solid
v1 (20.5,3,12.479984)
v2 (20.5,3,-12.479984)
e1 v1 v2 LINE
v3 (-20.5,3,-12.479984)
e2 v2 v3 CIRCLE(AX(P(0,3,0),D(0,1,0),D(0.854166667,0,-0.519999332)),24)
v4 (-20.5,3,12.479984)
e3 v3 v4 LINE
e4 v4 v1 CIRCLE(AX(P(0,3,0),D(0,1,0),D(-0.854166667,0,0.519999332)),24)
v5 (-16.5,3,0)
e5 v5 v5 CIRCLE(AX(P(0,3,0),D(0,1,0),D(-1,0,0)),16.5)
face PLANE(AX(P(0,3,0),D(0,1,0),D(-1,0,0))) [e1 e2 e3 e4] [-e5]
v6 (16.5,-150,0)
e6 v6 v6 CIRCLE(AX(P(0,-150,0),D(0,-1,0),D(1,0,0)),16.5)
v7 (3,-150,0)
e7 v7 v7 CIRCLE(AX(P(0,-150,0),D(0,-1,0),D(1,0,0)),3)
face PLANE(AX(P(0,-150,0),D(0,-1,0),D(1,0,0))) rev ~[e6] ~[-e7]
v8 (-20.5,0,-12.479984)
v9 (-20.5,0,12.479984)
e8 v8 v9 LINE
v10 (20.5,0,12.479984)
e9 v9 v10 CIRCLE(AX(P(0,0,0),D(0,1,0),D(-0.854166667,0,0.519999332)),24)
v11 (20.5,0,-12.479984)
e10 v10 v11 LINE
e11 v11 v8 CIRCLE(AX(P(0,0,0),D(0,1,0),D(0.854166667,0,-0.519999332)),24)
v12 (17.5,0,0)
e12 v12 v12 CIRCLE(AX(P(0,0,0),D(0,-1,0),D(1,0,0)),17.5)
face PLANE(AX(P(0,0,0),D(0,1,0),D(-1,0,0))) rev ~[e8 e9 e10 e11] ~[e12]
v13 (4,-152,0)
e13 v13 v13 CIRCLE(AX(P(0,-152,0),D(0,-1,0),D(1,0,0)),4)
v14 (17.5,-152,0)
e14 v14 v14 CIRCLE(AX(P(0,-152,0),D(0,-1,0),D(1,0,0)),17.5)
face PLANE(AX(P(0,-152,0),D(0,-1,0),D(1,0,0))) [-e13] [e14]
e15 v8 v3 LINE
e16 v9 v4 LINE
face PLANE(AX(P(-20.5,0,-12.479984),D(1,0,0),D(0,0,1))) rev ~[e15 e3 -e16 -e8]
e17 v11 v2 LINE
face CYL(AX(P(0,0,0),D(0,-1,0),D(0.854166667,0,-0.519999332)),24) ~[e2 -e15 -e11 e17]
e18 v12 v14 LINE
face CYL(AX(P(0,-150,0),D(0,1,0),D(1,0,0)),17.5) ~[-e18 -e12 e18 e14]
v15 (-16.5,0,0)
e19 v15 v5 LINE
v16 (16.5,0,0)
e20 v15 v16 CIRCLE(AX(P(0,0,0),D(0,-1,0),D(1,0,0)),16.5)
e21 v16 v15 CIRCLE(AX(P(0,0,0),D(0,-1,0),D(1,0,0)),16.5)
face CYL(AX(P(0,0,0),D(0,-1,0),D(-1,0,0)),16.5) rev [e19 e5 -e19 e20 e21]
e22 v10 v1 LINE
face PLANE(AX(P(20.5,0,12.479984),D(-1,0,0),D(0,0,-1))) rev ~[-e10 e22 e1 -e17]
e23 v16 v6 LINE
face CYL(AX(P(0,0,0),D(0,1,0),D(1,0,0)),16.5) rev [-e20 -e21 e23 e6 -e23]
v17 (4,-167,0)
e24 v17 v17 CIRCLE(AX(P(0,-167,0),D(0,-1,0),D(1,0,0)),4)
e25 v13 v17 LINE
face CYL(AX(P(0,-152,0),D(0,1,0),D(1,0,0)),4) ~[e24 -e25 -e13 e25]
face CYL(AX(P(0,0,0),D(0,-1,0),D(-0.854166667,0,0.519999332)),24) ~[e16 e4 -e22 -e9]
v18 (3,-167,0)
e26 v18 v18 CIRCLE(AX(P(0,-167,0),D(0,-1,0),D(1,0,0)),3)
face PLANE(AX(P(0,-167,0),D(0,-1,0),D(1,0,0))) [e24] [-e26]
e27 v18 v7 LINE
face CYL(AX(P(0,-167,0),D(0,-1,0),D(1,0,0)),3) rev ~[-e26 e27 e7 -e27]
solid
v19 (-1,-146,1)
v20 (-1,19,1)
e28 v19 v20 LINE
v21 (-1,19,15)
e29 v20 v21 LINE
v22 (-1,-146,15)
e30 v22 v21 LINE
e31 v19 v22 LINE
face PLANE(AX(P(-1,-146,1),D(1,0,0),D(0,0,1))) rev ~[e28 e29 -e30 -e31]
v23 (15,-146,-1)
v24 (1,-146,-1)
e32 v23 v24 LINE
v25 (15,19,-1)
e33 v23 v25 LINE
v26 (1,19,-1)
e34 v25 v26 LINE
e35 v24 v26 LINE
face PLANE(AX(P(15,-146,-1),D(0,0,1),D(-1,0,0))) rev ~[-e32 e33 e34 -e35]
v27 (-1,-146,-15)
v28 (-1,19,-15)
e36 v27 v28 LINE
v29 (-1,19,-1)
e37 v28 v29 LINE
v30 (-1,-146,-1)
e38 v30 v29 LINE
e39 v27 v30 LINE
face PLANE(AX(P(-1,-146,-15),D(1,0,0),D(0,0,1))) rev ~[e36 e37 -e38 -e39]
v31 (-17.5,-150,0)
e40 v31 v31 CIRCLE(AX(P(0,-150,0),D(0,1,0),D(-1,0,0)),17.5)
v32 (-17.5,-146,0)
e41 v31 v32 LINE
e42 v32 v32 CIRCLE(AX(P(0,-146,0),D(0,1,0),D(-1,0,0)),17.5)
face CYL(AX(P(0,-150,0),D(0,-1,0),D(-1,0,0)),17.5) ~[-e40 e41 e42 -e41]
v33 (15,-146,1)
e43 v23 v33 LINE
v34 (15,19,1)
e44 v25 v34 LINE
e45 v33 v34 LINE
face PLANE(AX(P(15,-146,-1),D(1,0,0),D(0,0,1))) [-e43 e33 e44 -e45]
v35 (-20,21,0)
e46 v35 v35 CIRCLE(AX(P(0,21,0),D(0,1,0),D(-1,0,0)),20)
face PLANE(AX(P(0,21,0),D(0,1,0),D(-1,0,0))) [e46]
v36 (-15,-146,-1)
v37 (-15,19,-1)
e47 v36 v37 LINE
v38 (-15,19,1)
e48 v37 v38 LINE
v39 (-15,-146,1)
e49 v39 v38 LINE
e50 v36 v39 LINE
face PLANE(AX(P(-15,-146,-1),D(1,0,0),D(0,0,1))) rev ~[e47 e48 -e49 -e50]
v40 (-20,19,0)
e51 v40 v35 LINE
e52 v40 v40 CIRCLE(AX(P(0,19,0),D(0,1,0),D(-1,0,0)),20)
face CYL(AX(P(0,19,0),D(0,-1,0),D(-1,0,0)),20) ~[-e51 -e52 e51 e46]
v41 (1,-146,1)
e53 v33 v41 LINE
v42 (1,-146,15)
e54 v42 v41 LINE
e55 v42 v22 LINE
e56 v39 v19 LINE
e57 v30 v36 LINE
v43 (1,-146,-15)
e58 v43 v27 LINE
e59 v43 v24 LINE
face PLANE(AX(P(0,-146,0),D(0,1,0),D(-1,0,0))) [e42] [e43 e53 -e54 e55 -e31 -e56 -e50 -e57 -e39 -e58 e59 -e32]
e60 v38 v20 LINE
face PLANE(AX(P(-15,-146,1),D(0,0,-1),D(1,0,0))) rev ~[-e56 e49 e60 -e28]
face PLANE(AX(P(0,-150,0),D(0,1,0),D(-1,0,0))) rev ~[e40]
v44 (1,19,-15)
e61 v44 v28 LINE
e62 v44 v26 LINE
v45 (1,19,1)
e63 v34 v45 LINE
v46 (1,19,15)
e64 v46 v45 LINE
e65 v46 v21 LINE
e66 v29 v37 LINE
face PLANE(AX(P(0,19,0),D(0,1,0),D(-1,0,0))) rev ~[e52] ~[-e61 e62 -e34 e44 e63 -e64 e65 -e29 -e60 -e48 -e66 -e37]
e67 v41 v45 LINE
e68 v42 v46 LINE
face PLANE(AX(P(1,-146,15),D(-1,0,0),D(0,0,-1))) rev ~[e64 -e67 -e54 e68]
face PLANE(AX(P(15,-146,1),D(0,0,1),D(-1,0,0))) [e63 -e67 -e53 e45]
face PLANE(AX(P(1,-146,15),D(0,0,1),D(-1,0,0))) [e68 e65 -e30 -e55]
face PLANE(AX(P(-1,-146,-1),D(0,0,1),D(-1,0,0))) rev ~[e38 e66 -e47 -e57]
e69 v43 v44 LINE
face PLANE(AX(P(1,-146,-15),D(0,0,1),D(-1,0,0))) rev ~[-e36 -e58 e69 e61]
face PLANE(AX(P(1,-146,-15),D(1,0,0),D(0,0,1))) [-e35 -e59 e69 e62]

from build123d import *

# Parameters (mm, degrees)
F0_R      = 17.5
F0_R_2    = 16.5
F1_DEPTH  = 150
F2_R      = 17.5
F3_DEPTH  = 2
F4_R      = 4
F5_DEPTH  = 15
F6_R      = 3
F7_DEPTH  = 17
F8_R      = 17.5
F8_R_2    = 16.5
F9_DEPTH  = 3
F10_R     = 17.5
F11_DEPTH = 4
F12_W     = 14
F12_H     = 2
F12_W_2   = 2
F12_H_2   = 14
F13_DEPTH = 165
F14_R     = 20
F15_DEPTH = 2


with BuildPart() as f1:
    # F0 (on Front) → F1 (new body)
    with BuildSketch(Plane.XZ):
        Circle(F0_R)
        Circle(F0_R_2, mode=Mode.SUBTRACT)
    extrude(amount=F1_DEPTH)

    # F2 (on face) → F3 (join)
    with BuildSketch(Plane.XZ.offset(150)):
        Circle(F2_R)
    extrude(amount=F3_DEPTH)

    # F4 (on face) → F5 (join)
    with BuildSketch(Plane.XZ.offset(152)):
        Circle(F4_R)
    extrude(amount=F5_DEPTH)

    # F6 (on face) → F7 (cut, through all)
    with BuildSketch(Plane.XZ.offset(167)):
        Circle(F6_R)
    extrude(amount=-F7_DEPTH, mode=Mode.SUBTRACT)

    # F8 (on face) → F9 (join)
    with BuildSketch(Plane(origin=(0, 0, 0), x_dir=(-1, 0, 0), z_dir=(0, 1, 0))):
        with BuildLine():
            Line((20.5, -12.4799839743), (20.5, 12.4799839743))
            ThreePointArc((20.5, 12.4799839743), (0, 24), (-20.5, 12.4799839743))
            Line((-20.5, 12.4799839743), (-20.5, -12.4799839743))
            ThreePointArc((-20.5, -12.4799839743), (0, -24), (20.5, -12.4799839743))
        make_face()
        Circle(F8_R, mode=Mode.SUBTRACT)
        Circle(F8_R)
        Circle(F8_R_2, mode=Mode.SUBTRACT)
    extrude(amount=F9_DEPTH)


with BuildPart() as f11:
    # F10 (on face) → F11 (new body)
    with BuildSketch(Plane(origin=(0, -150, 0), x_dir=(-1, 0, 0), z_dir=(0, 1, 0))):
        Circle(F10_R)
    extrude(amount=F11_DEPTH)

    # F12 (on face) → F13 (join)
    with BuildSketch(Plane(origin=(0, -146, 0), x_dir=(-1, 0, 0), z_dir=(0, 1, 0))):
        with Locations((8, 0)):
            Rectangle(F12_W, F12_H)
        Rectangle(F12_W_2, F12_H)
        with Locations((0, 8)):
            Rectangle(F12_W_2, F12_H_2)
        with Locations((-8, 0)):
            Rectangle(F12_W, F12_H)
        with Locations((0, -8)):
            Rectangle(F12_W_2, F12_H_2)
    extrude(amount=F13_DEPTH)

    # F14 (on face) → F15 (join)
    with BuildSketch(Plane(origin=(0, 19, 0), x_dir=(-1, 0, 0), z_dir=(0, 1, 0))):
        Circle(F14_R)
    extrude(amount=F15_DEPTH)


solid = Compound([f1.part, f11.part])
